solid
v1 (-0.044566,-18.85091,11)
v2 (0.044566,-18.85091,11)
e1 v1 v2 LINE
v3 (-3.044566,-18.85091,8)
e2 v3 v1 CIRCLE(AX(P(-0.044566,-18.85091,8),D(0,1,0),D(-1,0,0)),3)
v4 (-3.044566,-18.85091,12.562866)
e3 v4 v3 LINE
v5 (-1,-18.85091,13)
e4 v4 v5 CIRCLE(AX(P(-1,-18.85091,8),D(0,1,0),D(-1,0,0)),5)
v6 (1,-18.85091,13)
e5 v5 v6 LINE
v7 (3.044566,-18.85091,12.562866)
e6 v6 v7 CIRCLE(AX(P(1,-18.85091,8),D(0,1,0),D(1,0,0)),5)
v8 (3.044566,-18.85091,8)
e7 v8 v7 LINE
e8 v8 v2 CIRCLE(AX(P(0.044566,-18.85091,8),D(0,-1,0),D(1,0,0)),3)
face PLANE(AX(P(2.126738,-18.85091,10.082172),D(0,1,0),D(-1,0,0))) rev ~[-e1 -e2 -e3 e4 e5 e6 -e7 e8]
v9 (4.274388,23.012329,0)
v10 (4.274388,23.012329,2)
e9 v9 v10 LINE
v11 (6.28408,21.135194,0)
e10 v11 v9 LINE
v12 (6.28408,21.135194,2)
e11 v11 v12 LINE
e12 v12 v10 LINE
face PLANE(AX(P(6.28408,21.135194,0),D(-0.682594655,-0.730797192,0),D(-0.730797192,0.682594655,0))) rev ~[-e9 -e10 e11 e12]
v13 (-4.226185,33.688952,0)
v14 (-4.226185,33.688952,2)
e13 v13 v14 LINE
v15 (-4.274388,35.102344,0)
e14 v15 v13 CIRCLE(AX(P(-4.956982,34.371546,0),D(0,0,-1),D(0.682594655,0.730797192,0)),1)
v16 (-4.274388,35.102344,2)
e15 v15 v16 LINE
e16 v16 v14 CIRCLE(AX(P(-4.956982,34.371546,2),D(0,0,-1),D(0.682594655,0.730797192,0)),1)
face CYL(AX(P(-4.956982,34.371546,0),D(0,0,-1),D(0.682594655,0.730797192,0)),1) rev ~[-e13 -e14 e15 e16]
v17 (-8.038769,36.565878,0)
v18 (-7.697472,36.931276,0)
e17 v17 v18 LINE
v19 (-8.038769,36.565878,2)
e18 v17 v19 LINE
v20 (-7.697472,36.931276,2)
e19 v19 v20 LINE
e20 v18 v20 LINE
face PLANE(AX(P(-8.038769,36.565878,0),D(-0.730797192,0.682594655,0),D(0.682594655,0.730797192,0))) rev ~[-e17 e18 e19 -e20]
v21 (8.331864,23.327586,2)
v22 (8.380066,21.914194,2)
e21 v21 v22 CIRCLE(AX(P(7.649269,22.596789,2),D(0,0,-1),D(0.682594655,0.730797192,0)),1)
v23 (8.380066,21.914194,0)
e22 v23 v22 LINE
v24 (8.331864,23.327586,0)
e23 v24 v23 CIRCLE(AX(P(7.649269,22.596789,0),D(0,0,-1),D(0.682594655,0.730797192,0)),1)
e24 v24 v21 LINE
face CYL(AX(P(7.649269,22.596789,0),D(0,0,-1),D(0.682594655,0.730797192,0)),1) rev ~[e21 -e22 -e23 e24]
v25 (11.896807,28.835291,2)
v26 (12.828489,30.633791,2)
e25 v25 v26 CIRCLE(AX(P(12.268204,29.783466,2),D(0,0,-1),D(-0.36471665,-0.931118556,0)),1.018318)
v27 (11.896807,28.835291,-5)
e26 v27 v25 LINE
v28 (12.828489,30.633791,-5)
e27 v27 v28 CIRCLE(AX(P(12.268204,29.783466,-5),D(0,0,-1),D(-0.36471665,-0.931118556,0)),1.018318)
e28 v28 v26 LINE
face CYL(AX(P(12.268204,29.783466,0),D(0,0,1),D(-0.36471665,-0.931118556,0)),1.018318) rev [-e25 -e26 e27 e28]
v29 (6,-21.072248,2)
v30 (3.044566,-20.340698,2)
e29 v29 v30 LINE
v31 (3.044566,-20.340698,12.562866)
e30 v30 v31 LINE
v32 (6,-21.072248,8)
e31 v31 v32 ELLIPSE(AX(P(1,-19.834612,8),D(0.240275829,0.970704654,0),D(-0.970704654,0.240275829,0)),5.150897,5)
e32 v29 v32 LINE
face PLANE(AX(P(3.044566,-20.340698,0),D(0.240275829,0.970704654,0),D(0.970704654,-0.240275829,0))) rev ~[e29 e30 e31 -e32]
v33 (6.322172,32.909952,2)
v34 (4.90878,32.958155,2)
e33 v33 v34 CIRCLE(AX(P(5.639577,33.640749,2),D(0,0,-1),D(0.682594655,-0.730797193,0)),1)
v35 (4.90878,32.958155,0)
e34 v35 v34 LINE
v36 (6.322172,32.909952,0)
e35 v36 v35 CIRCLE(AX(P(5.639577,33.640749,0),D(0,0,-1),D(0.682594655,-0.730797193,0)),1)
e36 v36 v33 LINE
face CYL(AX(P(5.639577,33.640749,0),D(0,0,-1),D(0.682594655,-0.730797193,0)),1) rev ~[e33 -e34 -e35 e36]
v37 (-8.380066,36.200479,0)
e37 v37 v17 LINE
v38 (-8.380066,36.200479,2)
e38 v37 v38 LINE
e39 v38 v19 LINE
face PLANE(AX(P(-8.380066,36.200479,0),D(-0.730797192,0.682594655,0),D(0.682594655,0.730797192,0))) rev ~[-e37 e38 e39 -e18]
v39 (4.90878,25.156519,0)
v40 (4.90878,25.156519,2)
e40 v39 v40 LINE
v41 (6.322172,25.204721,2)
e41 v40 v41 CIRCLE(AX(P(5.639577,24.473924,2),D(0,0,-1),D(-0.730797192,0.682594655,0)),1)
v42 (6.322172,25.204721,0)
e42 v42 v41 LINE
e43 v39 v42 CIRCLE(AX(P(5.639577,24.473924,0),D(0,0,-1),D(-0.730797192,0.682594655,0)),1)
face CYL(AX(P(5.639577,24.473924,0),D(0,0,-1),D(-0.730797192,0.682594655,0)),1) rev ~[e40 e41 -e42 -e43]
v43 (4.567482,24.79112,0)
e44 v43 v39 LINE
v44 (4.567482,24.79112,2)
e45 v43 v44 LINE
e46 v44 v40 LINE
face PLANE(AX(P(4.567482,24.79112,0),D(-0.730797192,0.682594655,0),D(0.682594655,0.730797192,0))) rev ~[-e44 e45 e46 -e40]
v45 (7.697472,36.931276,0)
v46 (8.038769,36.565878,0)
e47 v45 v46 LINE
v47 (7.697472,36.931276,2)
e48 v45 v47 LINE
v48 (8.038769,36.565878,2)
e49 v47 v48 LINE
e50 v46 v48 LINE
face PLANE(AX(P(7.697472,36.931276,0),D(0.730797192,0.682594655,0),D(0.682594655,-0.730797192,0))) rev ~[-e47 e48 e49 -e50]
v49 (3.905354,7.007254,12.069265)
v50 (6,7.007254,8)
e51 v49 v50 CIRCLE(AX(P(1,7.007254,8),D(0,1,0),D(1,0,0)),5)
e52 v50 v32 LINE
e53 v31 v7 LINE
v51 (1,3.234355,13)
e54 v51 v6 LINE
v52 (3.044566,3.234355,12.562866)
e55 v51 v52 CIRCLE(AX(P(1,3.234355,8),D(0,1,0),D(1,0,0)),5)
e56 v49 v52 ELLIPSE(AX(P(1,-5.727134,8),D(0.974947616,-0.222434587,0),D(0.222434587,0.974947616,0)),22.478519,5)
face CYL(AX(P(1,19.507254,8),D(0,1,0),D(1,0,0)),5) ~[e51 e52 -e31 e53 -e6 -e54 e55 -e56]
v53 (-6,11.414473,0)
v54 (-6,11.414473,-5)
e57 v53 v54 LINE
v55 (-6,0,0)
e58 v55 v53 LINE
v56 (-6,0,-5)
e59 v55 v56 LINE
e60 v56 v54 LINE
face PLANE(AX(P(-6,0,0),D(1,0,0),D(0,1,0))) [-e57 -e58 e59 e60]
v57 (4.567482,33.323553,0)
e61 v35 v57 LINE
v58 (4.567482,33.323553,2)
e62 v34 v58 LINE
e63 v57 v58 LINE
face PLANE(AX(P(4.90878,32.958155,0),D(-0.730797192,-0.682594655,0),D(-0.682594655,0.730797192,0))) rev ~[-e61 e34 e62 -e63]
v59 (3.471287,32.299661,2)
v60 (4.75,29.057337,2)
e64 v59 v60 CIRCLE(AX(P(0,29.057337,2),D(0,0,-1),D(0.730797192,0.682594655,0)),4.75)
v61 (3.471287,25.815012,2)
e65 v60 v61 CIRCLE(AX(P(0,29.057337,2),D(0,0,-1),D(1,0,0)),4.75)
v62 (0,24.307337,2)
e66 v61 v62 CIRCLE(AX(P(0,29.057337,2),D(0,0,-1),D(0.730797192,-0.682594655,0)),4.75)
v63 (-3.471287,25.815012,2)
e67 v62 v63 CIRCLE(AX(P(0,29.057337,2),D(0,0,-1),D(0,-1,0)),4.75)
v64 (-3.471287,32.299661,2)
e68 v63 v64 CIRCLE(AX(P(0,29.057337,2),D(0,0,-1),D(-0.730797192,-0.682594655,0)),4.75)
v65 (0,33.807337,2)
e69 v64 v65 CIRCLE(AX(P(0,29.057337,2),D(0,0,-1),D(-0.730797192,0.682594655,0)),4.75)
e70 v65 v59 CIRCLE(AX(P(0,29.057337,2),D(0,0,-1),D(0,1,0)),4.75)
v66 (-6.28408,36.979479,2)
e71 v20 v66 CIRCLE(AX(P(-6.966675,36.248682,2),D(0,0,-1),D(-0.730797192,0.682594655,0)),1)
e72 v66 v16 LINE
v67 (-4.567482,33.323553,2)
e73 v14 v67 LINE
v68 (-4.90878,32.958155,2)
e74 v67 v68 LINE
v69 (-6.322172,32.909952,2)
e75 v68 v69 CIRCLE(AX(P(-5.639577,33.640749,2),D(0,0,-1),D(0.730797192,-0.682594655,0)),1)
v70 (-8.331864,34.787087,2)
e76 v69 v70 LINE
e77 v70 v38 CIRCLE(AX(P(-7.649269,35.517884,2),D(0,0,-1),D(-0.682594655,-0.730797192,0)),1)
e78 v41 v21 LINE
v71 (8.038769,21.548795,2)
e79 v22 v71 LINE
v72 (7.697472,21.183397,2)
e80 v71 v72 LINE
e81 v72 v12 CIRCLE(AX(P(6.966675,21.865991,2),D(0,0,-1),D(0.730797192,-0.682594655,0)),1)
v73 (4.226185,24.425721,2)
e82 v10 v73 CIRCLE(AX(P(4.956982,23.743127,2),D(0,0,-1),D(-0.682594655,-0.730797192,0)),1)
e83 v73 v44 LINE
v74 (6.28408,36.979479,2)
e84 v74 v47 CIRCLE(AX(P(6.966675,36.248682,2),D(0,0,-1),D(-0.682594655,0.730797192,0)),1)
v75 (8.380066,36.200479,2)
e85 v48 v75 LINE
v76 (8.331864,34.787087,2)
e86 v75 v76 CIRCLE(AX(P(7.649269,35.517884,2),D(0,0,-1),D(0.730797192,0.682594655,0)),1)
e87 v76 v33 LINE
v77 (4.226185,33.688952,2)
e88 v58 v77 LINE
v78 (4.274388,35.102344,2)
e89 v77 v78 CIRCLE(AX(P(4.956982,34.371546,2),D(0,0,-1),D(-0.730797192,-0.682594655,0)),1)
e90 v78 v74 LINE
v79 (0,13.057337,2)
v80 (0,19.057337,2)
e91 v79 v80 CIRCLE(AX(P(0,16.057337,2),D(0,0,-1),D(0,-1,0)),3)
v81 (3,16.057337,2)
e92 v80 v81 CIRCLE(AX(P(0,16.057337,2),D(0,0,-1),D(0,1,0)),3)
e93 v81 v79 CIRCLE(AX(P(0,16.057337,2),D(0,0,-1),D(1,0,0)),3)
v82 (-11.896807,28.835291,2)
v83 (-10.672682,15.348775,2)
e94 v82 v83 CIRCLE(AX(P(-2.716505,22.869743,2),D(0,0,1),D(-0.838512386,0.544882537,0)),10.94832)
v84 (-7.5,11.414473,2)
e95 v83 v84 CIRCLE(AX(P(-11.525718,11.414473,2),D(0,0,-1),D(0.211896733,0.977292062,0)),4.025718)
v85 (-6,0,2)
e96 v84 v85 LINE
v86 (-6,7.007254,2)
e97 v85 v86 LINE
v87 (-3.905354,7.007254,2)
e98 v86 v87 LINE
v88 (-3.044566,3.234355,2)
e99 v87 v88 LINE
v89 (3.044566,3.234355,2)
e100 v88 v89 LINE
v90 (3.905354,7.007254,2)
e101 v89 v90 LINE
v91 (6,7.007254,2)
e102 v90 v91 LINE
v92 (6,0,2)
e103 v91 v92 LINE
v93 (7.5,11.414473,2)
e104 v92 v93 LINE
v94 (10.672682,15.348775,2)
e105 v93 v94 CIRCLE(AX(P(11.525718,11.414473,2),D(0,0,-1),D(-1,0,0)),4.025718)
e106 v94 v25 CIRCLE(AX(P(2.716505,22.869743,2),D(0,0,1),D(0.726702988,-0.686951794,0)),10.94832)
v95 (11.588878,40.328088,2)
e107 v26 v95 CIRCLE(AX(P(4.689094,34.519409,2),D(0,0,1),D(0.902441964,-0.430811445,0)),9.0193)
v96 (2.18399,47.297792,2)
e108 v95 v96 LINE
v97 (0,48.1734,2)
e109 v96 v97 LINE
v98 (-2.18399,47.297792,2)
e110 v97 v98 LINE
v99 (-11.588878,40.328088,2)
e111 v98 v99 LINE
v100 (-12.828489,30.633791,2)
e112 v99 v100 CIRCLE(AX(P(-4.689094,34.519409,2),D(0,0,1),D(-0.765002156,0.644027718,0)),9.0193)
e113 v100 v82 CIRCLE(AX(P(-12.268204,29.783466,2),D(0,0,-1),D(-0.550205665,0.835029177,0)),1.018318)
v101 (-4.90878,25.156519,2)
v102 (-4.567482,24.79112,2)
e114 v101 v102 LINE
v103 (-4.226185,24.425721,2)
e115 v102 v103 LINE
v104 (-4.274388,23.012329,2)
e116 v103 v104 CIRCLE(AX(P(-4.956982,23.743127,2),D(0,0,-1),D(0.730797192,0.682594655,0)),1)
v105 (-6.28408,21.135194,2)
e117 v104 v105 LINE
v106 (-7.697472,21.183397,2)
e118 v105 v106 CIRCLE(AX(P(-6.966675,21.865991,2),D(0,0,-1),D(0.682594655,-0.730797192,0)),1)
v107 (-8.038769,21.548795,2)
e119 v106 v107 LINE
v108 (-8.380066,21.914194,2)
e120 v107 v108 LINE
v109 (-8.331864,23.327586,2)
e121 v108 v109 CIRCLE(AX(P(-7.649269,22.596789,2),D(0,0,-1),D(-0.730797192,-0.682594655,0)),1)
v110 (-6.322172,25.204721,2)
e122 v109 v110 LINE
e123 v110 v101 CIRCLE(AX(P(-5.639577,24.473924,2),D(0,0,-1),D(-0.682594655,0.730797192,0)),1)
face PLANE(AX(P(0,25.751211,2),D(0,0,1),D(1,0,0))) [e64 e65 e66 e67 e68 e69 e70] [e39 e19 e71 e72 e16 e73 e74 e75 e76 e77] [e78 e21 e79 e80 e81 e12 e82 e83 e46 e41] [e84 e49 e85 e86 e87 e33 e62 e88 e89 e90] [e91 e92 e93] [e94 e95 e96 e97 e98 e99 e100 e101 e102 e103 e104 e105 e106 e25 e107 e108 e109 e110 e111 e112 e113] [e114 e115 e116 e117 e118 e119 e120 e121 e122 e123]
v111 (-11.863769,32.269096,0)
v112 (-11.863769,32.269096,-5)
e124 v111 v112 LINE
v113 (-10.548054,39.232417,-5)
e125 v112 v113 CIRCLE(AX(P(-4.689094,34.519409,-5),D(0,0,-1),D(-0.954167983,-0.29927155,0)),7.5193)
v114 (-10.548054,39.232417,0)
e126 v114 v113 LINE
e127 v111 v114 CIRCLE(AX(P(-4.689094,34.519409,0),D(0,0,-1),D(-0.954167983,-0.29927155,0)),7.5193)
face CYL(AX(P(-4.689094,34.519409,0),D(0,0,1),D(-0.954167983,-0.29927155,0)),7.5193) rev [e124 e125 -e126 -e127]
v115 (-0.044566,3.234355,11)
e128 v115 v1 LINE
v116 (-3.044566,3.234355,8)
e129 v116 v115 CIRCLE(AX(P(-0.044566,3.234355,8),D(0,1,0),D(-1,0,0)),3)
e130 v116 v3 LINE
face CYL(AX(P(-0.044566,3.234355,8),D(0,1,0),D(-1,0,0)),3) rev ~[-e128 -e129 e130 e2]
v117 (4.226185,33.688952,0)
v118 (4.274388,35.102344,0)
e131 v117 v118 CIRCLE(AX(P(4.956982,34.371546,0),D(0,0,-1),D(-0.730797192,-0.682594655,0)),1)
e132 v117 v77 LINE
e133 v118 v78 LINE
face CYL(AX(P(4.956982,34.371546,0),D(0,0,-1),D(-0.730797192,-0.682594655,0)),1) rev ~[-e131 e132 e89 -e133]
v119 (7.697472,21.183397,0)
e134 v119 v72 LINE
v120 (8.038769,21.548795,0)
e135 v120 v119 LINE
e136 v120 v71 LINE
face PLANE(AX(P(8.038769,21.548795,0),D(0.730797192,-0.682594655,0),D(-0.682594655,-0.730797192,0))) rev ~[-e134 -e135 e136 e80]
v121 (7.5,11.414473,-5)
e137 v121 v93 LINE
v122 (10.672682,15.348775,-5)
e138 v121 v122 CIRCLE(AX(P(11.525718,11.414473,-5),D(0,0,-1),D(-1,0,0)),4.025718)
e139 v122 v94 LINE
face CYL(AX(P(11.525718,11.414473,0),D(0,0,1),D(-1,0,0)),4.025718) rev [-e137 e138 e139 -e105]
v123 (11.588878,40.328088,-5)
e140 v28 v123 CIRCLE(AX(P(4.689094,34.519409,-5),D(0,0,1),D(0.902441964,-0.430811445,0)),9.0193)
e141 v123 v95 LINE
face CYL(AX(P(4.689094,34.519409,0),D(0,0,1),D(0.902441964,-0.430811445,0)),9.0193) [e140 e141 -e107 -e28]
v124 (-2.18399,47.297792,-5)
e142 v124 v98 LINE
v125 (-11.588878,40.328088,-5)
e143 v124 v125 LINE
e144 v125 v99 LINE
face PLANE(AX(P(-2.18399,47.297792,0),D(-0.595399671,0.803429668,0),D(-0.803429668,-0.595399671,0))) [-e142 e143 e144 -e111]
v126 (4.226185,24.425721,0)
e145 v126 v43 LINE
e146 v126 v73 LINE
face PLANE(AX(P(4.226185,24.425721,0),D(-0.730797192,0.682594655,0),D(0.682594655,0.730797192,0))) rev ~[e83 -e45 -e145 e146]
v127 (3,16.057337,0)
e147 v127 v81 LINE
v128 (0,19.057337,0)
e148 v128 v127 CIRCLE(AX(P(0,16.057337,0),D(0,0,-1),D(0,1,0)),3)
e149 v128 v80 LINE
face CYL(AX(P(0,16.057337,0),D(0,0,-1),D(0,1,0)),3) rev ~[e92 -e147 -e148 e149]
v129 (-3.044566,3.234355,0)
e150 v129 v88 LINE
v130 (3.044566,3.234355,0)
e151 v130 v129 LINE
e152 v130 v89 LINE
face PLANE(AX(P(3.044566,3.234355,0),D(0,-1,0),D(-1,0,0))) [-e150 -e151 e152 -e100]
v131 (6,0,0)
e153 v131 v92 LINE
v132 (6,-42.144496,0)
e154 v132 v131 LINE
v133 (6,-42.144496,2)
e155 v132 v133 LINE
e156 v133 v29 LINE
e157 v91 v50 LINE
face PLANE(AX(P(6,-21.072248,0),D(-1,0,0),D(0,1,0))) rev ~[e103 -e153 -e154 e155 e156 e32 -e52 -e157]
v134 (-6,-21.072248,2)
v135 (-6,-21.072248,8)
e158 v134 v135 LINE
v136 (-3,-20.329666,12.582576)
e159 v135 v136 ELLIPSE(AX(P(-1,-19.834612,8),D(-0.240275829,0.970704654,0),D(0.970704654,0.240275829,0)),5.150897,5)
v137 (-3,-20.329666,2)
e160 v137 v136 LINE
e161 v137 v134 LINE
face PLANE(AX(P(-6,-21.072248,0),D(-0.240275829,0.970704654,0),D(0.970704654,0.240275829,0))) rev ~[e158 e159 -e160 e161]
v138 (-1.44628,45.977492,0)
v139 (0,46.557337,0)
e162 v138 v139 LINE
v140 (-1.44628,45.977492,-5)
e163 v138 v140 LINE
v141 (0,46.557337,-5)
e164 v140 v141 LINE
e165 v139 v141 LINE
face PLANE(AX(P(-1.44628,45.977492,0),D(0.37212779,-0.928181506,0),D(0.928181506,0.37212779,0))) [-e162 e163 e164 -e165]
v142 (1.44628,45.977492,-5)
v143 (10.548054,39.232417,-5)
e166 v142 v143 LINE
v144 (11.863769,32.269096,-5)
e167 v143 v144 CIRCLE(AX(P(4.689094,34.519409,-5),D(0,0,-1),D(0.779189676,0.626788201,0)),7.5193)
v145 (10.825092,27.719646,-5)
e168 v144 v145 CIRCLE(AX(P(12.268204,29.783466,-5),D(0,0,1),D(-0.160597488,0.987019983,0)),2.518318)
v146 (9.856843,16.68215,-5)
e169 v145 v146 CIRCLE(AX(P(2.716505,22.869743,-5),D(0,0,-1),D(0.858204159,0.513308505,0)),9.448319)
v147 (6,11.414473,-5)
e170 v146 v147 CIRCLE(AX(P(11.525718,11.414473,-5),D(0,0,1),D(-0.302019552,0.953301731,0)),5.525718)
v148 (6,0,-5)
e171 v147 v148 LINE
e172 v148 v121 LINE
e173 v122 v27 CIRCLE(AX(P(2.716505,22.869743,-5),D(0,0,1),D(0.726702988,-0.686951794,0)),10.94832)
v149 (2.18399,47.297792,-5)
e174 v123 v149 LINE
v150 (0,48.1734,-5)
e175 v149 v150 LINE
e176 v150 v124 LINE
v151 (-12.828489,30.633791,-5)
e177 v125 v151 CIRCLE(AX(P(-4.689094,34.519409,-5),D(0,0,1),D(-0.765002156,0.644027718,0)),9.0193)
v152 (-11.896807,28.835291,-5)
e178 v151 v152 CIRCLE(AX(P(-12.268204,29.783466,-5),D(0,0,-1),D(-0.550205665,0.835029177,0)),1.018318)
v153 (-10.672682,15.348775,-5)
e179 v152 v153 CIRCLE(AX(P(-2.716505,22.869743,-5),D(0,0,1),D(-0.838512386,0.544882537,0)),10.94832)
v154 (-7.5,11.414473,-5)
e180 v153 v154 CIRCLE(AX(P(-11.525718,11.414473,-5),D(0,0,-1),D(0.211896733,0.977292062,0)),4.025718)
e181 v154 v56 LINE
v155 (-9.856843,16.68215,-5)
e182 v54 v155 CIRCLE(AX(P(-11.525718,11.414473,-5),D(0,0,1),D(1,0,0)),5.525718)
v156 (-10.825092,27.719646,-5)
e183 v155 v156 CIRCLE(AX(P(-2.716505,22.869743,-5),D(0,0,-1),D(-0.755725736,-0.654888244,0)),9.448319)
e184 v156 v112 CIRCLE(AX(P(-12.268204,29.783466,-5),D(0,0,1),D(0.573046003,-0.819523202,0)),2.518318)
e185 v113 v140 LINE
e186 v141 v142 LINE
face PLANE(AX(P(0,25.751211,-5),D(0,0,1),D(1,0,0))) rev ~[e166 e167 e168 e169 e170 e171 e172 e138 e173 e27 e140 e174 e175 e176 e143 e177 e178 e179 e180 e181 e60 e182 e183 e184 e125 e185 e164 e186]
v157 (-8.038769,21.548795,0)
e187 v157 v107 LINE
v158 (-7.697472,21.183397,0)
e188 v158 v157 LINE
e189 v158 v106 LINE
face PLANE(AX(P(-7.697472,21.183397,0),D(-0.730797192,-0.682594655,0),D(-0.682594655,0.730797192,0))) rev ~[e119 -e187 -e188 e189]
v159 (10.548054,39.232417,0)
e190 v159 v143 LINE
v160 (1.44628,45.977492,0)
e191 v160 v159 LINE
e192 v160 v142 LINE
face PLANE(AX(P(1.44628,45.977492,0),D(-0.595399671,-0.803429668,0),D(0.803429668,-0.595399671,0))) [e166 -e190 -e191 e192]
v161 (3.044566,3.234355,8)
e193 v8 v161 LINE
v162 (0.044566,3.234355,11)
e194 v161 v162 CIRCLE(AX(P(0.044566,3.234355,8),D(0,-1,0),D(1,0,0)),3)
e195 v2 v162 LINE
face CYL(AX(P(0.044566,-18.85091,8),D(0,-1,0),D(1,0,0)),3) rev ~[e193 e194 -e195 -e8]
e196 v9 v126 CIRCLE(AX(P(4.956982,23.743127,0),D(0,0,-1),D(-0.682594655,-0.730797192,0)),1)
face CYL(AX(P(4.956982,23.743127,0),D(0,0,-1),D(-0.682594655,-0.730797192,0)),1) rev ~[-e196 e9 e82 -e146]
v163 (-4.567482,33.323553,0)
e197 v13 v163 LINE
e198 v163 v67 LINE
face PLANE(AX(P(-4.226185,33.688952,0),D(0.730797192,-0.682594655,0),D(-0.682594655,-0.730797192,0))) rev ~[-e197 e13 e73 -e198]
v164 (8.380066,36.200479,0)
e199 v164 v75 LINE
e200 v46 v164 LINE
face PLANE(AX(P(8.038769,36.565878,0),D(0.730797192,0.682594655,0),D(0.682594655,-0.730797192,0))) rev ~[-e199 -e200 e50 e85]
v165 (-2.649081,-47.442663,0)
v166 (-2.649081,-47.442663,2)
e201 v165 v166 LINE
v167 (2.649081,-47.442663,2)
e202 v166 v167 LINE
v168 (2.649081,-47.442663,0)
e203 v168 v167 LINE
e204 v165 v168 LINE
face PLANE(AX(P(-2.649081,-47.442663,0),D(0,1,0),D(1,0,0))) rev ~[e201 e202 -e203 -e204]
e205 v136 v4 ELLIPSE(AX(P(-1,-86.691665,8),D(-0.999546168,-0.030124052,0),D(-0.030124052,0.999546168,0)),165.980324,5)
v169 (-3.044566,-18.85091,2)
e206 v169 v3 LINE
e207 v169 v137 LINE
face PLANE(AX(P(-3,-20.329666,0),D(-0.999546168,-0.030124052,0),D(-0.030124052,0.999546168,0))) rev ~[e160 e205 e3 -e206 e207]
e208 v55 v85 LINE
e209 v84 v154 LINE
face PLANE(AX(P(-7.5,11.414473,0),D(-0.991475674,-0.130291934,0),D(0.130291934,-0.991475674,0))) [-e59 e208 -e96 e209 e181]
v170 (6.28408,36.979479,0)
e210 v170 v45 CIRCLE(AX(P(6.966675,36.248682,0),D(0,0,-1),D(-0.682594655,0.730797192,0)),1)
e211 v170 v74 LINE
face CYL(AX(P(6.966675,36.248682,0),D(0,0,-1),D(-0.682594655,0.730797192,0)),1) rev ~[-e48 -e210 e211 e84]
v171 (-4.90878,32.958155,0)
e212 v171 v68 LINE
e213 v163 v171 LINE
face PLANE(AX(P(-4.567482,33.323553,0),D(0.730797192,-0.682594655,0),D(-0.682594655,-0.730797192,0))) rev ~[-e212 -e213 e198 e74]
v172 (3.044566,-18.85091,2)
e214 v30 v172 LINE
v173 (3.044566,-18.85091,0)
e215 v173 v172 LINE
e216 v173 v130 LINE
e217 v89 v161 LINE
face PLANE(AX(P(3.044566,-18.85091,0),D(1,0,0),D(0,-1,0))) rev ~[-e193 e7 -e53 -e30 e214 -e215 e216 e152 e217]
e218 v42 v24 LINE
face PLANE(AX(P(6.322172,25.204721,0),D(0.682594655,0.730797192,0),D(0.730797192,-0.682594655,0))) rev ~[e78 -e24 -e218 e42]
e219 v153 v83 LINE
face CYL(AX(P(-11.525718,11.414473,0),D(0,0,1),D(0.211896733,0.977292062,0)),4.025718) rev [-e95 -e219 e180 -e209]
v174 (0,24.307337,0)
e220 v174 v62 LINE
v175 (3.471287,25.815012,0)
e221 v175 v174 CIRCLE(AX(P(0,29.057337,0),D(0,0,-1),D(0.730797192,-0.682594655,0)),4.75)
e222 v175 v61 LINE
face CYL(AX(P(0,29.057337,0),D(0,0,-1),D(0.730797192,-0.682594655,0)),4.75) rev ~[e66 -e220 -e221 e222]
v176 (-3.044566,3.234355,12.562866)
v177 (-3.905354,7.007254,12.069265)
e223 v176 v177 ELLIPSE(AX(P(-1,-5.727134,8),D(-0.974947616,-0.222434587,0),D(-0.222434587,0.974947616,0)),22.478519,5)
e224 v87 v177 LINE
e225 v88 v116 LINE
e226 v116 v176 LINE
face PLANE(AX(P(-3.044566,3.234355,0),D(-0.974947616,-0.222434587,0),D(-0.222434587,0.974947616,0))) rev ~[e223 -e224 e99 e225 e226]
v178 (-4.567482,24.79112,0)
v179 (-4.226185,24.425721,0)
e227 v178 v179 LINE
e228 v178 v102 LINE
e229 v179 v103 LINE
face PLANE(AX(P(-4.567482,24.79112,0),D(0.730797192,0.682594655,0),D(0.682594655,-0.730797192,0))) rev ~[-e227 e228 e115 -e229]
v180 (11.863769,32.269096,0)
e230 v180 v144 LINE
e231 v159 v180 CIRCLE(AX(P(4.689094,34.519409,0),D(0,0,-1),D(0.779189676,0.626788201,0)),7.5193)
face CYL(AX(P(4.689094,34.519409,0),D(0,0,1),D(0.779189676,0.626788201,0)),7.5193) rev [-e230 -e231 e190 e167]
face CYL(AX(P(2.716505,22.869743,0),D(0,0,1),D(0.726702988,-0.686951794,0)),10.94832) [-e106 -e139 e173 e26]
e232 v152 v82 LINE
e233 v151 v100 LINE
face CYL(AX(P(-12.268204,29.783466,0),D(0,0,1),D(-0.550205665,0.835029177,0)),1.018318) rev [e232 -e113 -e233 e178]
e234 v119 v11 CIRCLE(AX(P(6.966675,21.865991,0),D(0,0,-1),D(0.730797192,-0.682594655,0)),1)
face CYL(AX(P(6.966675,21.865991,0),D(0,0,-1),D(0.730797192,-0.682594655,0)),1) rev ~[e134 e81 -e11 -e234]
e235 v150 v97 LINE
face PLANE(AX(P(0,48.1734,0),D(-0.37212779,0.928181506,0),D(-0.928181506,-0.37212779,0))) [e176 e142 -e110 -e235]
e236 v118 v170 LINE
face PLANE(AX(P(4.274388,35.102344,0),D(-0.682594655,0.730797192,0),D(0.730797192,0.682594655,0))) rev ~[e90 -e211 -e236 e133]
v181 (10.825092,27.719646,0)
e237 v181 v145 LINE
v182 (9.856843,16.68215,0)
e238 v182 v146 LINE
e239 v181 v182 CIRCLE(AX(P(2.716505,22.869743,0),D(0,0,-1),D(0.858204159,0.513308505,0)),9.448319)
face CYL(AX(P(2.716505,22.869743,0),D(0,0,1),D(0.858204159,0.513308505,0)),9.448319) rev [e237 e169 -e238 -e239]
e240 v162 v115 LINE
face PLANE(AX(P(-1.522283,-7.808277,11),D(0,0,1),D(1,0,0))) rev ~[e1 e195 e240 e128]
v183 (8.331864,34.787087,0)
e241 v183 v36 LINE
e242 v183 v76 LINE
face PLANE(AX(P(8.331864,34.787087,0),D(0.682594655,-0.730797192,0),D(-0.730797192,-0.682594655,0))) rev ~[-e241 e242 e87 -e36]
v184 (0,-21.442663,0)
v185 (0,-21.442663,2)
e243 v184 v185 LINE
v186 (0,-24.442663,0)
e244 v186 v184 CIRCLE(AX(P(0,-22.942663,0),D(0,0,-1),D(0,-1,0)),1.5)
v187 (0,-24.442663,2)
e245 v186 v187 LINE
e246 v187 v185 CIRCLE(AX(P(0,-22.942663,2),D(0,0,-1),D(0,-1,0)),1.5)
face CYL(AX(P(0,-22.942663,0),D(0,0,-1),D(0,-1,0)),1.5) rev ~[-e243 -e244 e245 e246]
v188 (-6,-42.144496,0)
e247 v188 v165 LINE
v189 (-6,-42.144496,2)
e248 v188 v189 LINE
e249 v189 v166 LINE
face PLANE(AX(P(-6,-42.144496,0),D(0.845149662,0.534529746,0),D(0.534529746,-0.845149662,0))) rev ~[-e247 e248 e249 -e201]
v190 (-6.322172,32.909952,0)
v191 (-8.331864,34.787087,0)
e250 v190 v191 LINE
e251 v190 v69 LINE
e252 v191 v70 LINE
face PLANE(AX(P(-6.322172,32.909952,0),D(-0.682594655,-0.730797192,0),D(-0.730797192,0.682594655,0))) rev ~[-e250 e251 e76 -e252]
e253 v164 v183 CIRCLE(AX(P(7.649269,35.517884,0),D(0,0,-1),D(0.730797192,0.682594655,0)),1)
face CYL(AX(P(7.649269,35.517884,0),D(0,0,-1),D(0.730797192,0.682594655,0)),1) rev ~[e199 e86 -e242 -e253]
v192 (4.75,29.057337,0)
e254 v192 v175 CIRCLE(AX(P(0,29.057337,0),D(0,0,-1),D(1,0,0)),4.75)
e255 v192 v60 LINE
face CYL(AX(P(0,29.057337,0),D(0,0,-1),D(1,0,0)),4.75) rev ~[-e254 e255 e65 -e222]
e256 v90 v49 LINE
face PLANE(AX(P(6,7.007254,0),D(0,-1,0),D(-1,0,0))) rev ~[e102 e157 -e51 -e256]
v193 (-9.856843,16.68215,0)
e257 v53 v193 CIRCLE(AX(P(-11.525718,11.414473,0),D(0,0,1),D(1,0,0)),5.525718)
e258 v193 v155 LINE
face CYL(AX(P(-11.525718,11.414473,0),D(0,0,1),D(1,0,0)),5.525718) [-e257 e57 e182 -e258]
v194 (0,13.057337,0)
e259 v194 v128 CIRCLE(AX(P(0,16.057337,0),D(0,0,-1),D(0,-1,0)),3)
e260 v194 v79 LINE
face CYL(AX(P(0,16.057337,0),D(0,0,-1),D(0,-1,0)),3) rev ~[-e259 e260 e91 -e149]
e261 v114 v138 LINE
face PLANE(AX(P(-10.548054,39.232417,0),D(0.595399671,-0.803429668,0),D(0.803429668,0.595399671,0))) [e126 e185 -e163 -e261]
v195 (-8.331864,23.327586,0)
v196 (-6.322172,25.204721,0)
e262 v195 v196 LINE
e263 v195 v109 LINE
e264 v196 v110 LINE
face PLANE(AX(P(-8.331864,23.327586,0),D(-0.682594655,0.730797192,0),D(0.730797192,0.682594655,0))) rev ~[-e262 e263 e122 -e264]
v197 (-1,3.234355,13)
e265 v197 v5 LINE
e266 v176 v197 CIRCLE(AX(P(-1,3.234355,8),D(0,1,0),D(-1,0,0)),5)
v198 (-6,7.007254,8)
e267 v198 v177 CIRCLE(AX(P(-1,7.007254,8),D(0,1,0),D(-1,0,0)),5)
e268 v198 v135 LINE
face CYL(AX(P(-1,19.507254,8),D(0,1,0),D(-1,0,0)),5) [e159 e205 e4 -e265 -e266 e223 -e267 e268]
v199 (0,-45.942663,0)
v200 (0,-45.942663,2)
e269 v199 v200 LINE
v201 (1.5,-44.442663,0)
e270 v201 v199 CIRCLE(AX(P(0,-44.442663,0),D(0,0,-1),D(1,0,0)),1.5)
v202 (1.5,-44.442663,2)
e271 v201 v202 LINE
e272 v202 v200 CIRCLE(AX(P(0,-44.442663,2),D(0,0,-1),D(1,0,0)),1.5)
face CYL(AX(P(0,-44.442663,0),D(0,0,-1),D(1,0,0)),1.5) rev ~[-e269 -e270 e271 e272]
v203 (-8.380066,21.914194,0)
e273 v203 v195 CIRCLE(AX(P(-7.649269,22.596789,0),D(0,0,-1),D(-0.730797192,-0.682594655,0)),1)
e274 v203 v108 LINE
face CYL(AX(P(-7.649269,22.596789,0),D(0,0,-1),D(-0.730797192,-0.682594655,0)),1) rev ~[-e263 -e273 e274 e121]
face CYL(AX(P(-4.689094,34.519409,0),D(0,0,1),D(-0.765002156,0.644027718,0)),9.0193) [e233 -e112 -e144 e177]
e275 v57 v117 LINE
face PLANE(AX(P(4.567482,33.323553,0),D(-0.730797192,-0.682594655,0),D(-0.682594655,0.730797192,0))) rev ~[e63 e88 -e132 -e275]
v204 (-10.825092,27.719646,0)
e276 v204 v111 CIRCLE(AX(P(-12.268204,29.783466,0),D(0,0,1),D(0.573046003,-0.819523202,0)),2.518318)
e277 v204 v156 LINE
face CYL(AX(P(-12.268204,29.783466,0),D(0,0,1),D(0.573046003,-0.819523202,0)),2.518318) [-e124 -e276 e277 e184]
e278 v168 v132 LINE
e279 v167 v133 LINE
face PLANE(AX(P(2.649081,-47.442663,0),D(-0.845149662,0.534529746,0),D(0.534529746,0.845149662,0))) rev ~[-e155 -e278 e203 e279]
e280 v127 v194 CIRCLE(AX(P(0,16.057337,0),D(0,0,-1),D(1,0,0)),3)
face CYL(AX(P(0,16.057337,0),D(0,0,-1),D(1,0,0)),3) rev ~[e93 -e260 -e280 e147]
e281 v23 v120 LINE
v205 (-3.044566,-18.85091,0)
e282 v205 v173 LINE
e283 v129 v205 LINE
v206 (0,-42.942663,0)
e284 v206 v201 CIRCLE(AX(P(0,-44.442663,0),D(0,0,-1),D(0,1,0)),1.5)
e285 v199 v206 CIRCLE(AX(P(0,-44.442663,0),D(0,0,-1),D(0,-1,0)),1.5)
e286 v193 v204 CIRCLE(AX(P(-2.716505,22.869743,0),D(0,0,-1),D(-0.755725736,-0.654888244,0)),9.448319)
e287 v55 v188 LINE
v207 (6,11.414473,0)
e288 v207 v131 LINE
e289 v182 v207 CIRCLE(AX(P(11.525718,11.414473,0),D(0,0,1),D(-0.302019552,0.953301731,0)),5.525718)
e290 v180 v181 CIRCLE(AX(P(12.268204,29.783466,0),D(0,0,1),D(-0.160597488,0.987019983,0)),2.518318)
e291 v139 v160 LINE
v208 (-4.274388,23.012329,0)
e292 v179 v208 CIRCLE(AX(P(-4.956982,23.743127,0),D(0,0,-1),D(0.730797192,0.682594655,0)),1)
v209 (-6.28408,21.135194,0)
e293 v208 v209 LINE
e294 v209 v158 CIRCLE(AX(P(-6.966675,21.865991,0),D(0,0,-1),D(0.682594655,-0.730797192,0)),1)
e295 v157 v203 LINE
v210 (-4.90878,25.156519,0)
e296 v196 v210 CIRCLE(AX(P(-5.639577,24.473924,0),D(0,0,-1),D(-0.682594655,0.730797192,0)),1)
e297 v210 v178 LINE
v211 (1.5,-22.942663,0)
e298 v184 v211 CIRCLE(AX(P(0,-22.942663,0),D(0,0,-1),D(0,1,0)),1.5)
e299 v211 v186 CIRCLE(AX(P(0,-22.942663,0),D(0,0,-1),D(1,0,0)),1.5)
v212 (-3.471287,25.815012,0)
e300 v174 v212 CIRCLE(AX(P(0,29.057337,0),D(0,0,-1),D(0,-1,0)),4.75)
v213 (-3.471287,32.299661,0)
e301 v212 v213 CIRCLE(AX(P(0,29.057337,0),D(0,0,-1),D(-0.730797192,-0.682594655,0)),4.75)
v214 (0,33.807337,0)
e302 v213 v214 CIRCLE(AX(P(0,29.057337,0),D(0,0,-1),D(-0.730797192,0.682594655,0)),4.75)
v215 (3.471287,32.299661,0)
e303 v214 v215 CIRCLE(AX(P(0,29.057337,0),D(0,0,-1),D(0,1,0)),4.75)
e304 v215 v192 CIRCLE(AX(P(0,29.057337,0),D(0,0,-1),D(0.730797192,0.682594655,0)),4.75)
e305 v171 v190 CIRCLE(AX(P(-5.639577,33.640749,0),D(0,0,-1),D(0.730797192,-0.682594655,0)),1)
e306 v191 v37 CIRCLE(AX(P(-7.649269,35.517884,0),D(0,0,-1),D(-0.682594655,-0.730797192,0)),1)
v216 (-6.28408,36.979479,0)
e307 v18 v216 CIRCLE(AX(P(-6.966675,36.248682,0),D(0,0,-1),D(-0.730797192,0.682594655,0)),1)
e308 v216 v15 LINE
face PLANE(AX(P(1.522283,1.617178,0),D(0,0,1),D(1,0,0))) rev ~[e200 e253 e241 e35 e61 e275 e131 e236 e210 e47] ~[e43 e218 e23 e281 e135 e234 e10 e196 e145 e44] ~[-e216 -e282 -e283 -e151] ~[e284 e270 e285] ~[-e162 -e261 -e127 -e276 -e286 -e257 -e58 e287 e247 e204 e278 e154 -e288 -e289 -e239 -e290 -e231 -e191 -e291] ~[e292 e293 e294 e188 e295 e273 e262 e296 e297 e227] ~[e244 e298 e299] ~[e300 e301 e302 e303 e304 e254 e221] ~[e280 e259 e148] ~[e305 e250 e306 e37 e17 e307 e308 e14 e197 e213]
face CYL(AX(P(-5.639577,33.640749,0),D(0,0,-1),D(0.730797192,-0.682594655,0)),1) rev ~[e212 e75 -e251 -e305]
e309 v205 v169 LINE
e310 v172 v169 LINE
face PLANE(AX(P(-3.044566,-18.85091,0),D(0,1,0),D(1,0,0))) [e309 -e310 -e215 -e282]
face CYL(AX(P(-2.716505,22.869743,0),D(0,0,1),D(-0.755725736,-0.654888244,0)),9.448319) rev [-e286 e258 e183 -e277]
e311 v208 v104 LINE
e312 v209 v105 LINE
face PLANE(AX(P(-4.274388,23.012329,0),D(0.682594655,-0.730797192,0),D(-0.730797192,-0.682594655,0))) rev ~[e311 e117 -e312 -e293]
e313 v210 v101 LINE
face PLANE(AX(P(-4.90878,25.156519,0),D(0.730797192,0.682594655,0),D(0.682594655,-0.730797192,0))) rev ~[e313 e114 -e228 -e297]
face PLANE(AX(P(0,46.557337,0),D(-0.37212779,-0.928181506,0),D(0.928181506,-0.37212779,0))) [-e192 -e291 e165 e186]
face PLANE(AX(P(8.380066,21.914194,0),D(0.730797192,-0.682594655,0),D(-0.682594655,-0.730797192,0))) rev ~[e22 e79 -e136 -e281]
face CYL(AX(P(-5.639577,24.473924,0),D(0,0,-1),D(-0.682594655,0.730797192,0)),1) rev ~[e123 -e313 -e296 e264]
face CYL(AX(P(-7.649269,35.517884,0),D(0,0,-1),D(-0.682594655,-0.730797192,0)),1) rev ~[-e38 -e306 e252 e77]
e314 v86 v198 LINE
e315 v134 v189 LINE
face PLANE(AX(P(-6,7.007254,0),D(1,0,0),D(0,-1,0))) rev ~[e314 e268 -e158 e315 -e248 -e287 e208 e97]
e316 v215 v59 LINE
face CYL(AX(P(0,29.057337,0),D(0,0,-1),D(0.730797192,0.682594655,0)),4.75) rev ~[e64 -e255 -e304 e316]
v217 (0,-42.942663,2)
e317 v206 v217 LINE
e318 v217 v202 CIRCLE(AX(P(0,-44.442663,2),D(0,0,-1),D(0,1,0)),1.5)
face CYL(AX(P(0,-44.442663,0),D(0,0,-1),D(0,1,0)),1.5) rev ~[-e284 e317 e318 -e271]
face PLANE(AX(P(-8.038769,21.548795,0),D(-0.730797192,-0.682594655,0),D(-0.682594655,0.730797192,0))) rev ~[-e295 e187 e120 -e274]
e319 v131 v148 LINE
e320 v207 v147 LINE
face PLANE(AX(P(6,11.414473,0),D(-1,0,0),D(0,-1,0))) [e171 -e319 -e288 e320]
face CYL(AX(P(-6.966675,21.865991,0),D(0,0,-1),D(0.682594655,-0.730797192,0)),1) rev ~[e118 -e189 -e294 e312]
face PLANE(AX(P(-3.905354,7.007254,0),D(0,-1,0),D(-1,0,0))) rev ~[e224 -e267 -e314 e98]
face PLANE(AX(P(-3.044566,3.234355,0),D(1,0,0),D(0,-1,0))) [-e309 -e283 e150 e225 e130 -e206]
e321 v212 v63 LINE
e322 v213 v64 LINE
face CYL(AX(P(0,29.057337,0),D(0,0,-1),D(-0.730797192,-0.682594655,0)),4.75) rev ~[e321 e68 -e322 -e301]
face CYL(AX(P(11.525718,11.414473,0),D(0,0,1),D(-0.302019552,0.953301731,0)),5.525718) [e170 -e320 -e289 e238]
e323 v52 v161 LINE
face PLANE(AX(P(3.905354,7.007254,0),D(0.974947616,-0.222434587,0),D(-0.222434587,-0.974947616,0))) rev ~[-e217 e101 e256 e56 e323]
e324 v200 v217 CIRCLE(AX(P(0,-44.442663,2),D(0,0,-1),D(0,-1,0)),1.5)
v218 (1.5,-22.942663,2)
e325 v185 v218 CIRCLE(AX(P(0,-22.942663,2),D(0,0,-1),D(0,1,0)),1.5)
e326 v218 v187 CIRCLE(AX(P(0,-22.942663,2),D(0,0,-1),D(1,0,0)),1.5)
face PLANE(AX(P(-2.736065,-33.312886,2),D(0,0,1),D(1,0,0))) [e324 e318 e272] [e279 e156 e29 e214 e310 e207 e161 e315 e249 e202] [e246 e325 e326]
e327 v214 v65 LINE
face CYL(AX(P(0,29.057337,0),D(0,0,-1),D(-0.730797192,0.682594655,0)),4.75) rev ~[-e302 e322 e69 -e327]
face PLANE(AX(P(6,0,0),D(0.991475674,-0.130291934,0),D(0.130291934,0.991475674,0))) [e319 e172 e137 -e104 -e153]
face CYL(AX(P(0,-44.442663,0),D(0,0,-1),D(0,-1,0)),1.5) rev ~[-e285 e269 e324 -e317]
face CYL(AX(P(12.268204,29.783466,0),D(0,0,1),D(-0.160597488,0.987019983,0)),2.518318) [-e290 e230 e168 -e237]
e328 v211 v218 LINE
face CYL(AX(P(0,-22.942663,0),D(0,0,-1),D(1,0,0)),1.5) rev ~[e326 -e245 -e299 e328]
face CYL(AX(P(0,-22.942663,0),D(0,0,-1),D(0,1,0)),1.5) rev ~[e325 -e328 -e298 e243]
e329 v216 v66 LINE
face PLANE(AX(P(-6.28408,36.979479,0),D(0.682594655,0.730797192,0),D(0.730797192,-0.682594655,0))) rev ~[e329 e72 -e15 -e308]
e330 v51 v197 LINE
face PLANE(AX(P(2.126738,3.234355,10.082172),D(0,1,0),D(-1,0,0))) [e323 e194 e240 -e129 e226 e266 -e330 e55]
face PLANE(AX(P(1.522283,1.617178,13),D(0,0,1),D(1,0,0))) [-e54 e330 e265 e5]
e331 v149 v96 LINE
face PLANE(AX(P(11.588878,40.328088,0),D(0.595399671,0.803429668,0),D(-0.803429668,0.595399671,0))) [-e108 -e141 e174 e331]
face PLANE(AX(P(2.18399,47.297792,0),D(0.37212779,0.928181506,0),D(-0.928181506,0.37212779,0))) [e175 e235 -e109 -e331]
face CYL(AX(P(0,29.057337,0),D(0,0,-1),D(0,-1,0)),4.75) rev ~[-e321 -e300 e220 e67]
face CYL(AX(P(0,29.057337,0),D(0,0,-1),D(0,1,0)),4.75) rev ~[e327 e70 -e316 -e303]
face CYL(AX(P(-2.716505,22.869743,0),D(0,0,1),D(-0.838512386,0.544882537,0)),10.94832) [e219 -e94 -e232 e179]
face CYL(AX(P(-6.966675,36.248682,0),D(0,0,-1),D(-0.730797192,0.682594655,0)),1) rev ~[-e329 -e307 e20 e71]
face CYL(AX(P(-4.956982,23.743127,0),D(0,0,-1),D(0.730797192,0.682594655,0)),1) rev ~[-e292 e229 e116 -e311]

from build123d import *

# Parameters (mm, degrees)
F1_DEPTH     = 2
F0_W         = 3.0445663724
F0_H         = 3.2343552448
F0_H_2       = 18.850909546
F2_DEPTH     = 13
F3_DEPTH     = 11
F4_T4_DEPTH  = 22.0852647908
F4_T9_DEPTH  = 22.0852647908
F4_T15_DEPTH = 22.0852647908
F4_T20_DEPTH = 22.0852647908
F5_DEPTH     = 5
F6_T1_DEPTH  = 53.0795018189


# Not quite as in the source:
# - a fillet or chamfer that OpenCascade refuses, or shapes differently, is made with other operations: its cross-section is extruded or revolved along the edge and cut away or added


with BuildPart() as f1:
    # F0 (on Top) → F1 (new body)
    with BuildSketch(Plane.XY):
        with BuildLine():
            Line((0, -21.442663461), (0, -19.587084651))
            Line((0, -19.587084651), (-3, -20.329666324))
            Line((-3, -20.329666324), (-6, -21.0722479969))
            Line((-6, -21.0722479969), (-6, -42.1444959939))
            Line((-6, -42.1444959939), (-2.6490809396, -47.442663461))
            Line((-2.6490809396, -47.442663461), (0, -47.442663461))
            Line((0, -47.442663461), (0, -45.942663461))
            ThreePointArc((0, -45.942663461), (-1.5, -44.442663461), (0, -42.942663461))
            Line((0, -42.942663461), (0, -24.442663461))
            ThreePointArc((0, -24.442663461), (-1.5, -22.942663461), (0, -21.442663461))
        make_face()
        with BuildLine():
            Line((3.0445663724, -20.3406977144), (0, -19.587084651))
            Line((0, -19.587084651), (0, -21.442663461))
            ThreePointArc((0, -21.442663461), (1.0606601718, -21.8820032892), (1.5, -22.942663461))
            ThreePointArc((1.5, -22.942663461), (1.0606601718, -24.0033236327), (0, -24.442663461))
            Line((0, -24.442663461), (0, -42.942663461))
            ThreePointArc((0, -42.942663461), (1.0606601718, -43.3820032892), (1.5, -44.442663461))
            ThreePointArc((1.5, -44.442663461), (1.0606601718, -45.5033236327), (0, -45.942663461))
            Line((0, -45.942663461), (0, -47.442663461))
            Line((0, -47.442663461), (2.6490809396, -47.442663461))
            Line((2.6490809396, -47.442663461), (6, -42.1444959939))
            Line((6, -42.1444959939), (6, -21.0722479969))
            Line((6, -21.0722479969), (3.0445663724, -20.3406977144))
        make_face()
        Polygon((3.0445663724, -18.850909546), (0, -18.850909546), (0, -19.587084651), (3.0445663724, -20.3406977144), align=None)
        Polygon((0, -19.587084651), (0, -18.850909546), (-3.0445663724, -18.850909546), (-3, -20.329666324), align=None)
    extrude(amount=F1_DEPTH)



with BuildPart() as f1b:
    # F0 (on Top) → F1, piece 2 (new body)
    with BuildSketch(Plane.XY):
        with BuildLine():
            Line((-6, 7.0072538219), (-6, 11.414472945))
            ThreePointArc((-6, 11.414472945), (-7.0672827337, 14.6788128793), (-9.8568433896, 16.6821498424))
            ThreePointArc((-9.8568433896, 16.6821498424), (-12.1286787232, 22.0440734554), (-10.825092271, 27.7196459355))
            ThreePointArc((-10.825092271, 27.7196459355), (-9.8130602705, 30.3439953427), (-11.8637687892, 32.269096159))
            ThreePointArc((-11.8637687892, 32.269096159), (-12.0776575065, 35.9154722642), (-10.5480544763, 39.2324168906))
            Line((-10.5480544763, 39.2324168906), (-1.4462802792, 45.9774918854))
            Line((-1.4462802792, 45.9774918854), (0, 46.557336539))
            Line((0, 46.557336539), (1.4462802792, 45.9774918854))
            Line((1.4462802792, 45.9774918854), (10.5480544763, 39.2324168906))
            ThreePointArc((10.5480544763, 39.2324168906), (12.0776575065, 35.9154722642), (11.8637687892, 32.269096159))
            ThreePointArc((11.8637687892, 32.269096159), (9.8130602705, 30.3439953427), (10.825092271, 27.7196459355))
            ThreePointArc((10.825092271, 27.7196459355), (12.1286787232, 22.0440734554), (9.8568433896, 16.6821498424))
            ThreePointArc((9.8568433896, 16.6821498424), (7.0672827337, 14.6788128793), (6, 11.414472945))
            Line((6, 11.414472945), (6, 7.0072538219))
            Line((6, 7.0072538219), (6, 0))
            Line((6, 0), (7.5000002513, 11.414472945))
            ThreePointArc((7.5000002513, 11.414472945), (8.391991284, 13.9415584091), (10.6726818627, 15.3487753182))
            ThreePointArc((10.6726818627, 15.3487753182), (13.6200024271, 21.8800699646), (11.8968068959, 28.8352914154))
            ThreePointArc((11.8968068959, 28.8352914154), (11.3640087027, 30.251868892), (12.8284885302, 30.6337910005))
            ThreePointArc((12.8284885302, 30.6337910005), (13.635549564, 35.6633929404), (11.5888776878, 40.3280877233))
            Line((11.5888776878, 40.3280877233), (2.1839900136, 47.2977917949))
            Line((2.1839900136, 47.2977917949), (0, 48.173400037))
            Line((0, 48.173400037), (-2.1839900136, 47.2977917949))
            Line((-2.1839900136, 47.2977917949), (-11.5888776878, 40.3280877233))
            ThreePointArc((-11.5888776878, 40.3280877233), (-13.635549564, 35.6633929404), (-12.8284885302, 30.6337910005))
            ThreePointArc((-12.8284885302, 30.6337910005), (-11.3640087027, 30.251868892), (-11.8968068959, 28.8352914154))
            ThreePointArc((-11.8968068959, 28.8352914154), (-13.6200024271, 21.8800699646), (-10.6726818627, 15.3487753182))
            ThreePointArc((-10.6726818627, 15.3487753182), (-8.391991284, 13.9415584091), (-7.5000002513, 11.414472945))
            Line((-7.5000002513, 11.414472945), (-6, 0))
            Line((-6, 0), (-6, 7.0072538219))
        make_face()
        with BuildLine():
            Line((-6, 11.414472945), (0, 11.414472945))
            Line((0, 11.414472945), (0, 13.057336539))
            ThreePointArc((0, 13.057336539), (-3, 16.057336539), (0, 19.057336539))
            Line((0, 19.057336539), (0, 24.307336539))
            ThreePointArc((0, 24.307336539), (-1.892281439, 24.7005291121), (-3.4712866642, 25.8150119262))
            ThreePointArc((-3.4712866642, 25.8150119262), (-4.75, 29.057336539), (-3.4712866642, 32.2996611519))
            ThreePointArc((-3.4712866642, 32.2996611519), (-1.892281439, 33.414143966), (0, 33.807336539))
            Line((0, 33.807336539), (0, 46.557336539))
            Line((0, 46.557336539), (-1.4462802792, 45.9774918854))
            Line((-1.4462802792, 45.9774918854), (-10.5480544763, 39.2324168906))
            ThreePointArc((-10.5480544763, 39.2324168906), (-12.0776575065, 35.9154722642), (-11.8637687892, 32.269096159))
            ThreePointArc((-11.8637687892, 32.269096159), (-9.8130602705, 30.3439953427), (-10.825092271, 27.7196459355))
            ThreePointArc((-10.825092271, 27.7196459355), (-12.1286787232, 22.0440734554), (-9.8568433896, 16.6821498424))
            ThreePointArc((-9.8568433896, 16.6821498424), (-7.0672827337, 14.6788128793), (-6, 11.414472945))
        make_face()
        with BuildLine():
            Line((-4.9087797805, 25.1565185394), (-4.5674824529, 24.7911199432))
            Line((-4.5674824529, 24.7911199432), (-4.2261851252, 24.4257213469))
            ThreePointArc((-4.2261851252, 24.4257213469), (-3.9575633576, 23.7090423507), (-4.2743876623, 23.0123294991))
            Line((-4.2743876623, 23.0123294991), (-6.2840799416, 21.135194197))
            ThreePointArc((-6.2840799416, 21.135194197), (-7.0007589378, 20.8665724294), (-7.6974717894, 21.1833967341))
            Line((-7.6974717894, 21.1833967341), (-8.038769117, 21.5487953303))
            Line((-8.038769117, 21.5487953303), (-8.3800664447, 21.9141939265))
            ThreePointArc((-8.3800664447, 21.9141939265), (-8.6486882123, 22.6308729227), (-8.3318639076, 23.3275857743))
            Line((-8.3318639076, 23.3275857743), (-6.3221716283, 25.2047210765))
            ThreePointArc((-6.3221716283, 25.2047210765), (-5.6054926321, 25.4733428441), (-4.9087797805, 25.1565185394))
        make_face(mode=Mode.SUBTRACT)
        with BuildLine():
            Line((-4.2261851252, 33.6889517311), (-4.5674824529, 33.3235531349))
            Line((-4.5674824529, 33.3235531349), (-4.9087797805, 32.9581545387))
            ThreePointArc((-4.9087797805, 32.9581545387), (-5.6054926321, 32.641330234), (-6.3221716283, 32.9099520015))
            Line((-6.3221716283, 32.9099520015), (-8.3318639076, 34.7870873037))
            ThreePointArc((-8.3318639076, 34.7870873037), (-8.6486882123, 35.4838001553), (-8.3800664447, 36.2004791515))
            Line((-8.3800664447, 36.2004791515), (-8.038769117, 36.5658777478))
            Line((-8.038769117, 36.5658777478), (-7.6974717894, 36.931276344))
            ThreePointArc((-7.6974717894, 36.931276344), (-7.0007589378, 37.2481006487), (-6.2840799416, 36.9794788811))
            Line((-6.2840799416, 36.9794788811), (-4.2743876623, 35.1023435789))
            ThreePointArc((-4.2743876623, 35.1023435789), (-3.9575633576, 34.4056307273), (-4.2261851252, 33.6889517311))
        make_face(mode=Mode.SUBTRACT)
        with BuildLine():
            Line((0, 13.057336539), (0, 11.414472945))
            Line((0, 11.414472945), (6, 11.414472945))
            ThreePointArc((6, 11.414472945), (7.0672827337, 14.6788128793), (9.8568433896, 16.6821498424))
            ThreePointArc((9.8568433896, 16.6821498424), (12.1286787232, 22.0440734554), (10.825092271, 27.7196459355))
            ThreePointArc((10.825092271, 27.7196459355), (9.8130602705, 30.3439953427), (11.8637687892, 32.269096159))
            ThreePointArc((11.8637687892, 32.269096159), (12.0776575065, 35.9154722642), (10.5480544763, 39.2324168906))
            Line((10.5480544763, 39.2324168906), (1.4462802792, 45.9774918854))
            Line((1.4462802792, 45.9774918854), (0, 46.557336539))
            Line((0, 46.557336539), (0, 33.807336539))
            ThreePointArc((0, 33.807336539), (1.892281439, 33.414143966), (3.4712866642, 32.2996611519))
            ThreePointArc((3.4712866642, 32.2996611519), (4.4187731134, 30.8000195775), (4.75, 29.057336539))
            ThreePointArc((4.75, 29.057336539), (4.4187731134, 27.3146535006), (3.4712866642, 25.8150119262))
            ThreePointArc((3.4712866642, 25.8150119262), (1.892281439, 24.7005291121), (0, 24.307336539))
            Line((0, 24.307336539), (0, 19.057336539))
            ThreePointArc((0, 19.057336539), (2.1213203436, 18.1786568826), (3, 16.057336539))
            ThreePointArc((3, 16.057336539), (2.1213203436, 13.9360161955), (0, 13.057336539))
        make_face()
        with BuildLine():
            Line((4.2261851252, 24.4257213469), (4.5674824529, 24.7911199432))
            Line((4.5674824529, 24.7911199432), (4.9087797805, 25.1565185394))
            ThreePointArc((4.9087797805, 25.1565185394), (5.6054926321, 25.4733428441), (6.3221716283, 25.2047210765))
            Line((6.3221716283, 25.2047210765), (8.3318639076, 23.3275857743))
            ThreePointArc((8.3318639076, 23.3275857743), (8.6486882123, 22.6308729227), (8.3800664447, 21.9141939265))
            Line((8.3800664447, 21.9141939265), (8.038769117, 21.5487953303))
            Line((8.038769117, 21.5487953303), (7.6974717894, 21.1833967341))
            ThreePointArc((7.6974717894, 21.1833967341), (7.0007589378, 20.8665724294), (6.2840799416, 21.135194197))
            Line((6.2840799416, 21.135194197), (4.2743876623, 23.0123294991))
            ThreePointArc((4.2743876623, 23.0123294991), (3.9575633576, 23.7090423507), (4.2261851252, 24.4257213469))
        make_face(mode=Mode.SUBTRACT)
        with BuildLine():
            Line((4.9087797805, 32.9581545387), (4.5674824529, 33.3235531349))
            Line((4.5674824529, 33.3235531349), (4.2261851252, 33.6889517311))
            ThreePointArc((4.2261851252, 33.6889517311), (3.9575633576, 34.4056307273), (4.2743876623, 35.1023435789))
            Line((4.2743876623, 35.1023435789), (6.2840799416, 36.9794788811))
            ThreePointArc((6.2840799416, 36.9794788811), (7.0007589378, 37.2481006487), (7.6974717894, 36.931276344))
            Line((7.6974717894, 36.931276344), (8.038769117, 36.5658777478))
            Line((8.038769117, 36.5658777478), (8.3800664447, 36.2004791515))
            ThreePointArc((8.3800664447, 36.2004791515), (8.6486882123, 35.4838001553), (8.3318639076, 34.7870873037))
            Line((8.3318639076, 34.7870873037), (6.3221716283, 32.9099520015))
            ThreePointArc((6.3221716283, 32.9099520015), (5.6054926321, 32.641330234), (4.9087797805, 32.9581545387))
        make_face(mode=Mode.SUBTRACT)
        Polygon((0, 11.414472945), (0, 7.0072538219), (3.9053543005, 7.0072538219), (6, 7.0072538219), (6, 11.414472945), align=None)
        Polygon((-3.9053543005, 7.0072538219), (0, 7.0072538219), (0, 11.414472945), (-6, 11.414472945), (-6, 7.0072538219), align=None)
        Polygon((0, 3.2343552448), (0, 7.0072538219), (-3.9053543005, 7.0072538219), (-3.0445663724, 3.2343552448), align=None)
        Polygon((3.9053543005, 7.0072538219), (0, 7.0072538219), (0, 3.2343552448), (3.0445663724, 3.2343552448), align=None)
    extrude(amount=F1_DEPTH)


with BuildPart() as f1_1:
    add(f1.part)

    add(f1b.part)  # F2 merges F1b
    # F0 (on Top) → F2 (join)
    with BuildSketch(Plane.XY):
        with Locations((1.5222831862, 1.6171776224)):
            Rectangle(F0_W, F0_H)
        Polygon((-3.0445663724, 3.2343552448), (-3.9053543005, 7.0072538219), (-6, 7.0072538219), (-6, 0), (-6, -21.0722479969), (-3, -20.329666324), (-3.0445663724, -18.850909546), align=None)
        with Locations((1.5222831862, -9.425454773)):
            Rectangle(F0_W, F0_H_2)
        Polygon((0, 0), (0, 3.2343552448), (-3.0445663724, 3.2343552448), (-3.0445663724, -18.850909546), (0, -18.850909546), align=None)
        Polygon((6, 0), (3.0445663724, 0), (3.0445663724, -18.850909546), (3.0445663724, -20.3406977144), (6, -21.0722479969), align=None)
        Polygon((6, 7.0072538219), (3.9053543005, 7.0072538219), (3.0445663724, 3.2343552448), (3.0445663724, 0), (6, 0), align=None)
    extrude(amount=F2_DEPTH)

    # F0 (on Top) → F3 (cut)
    with BuildSketch(Plane.XY):
        Polygon((0, 0), (0, 3.2343552448), (-3.0445663724, 3.2343552448), (-3.0445663724, -18.850909546), (0, -18.850909546), align=None)
        with Locations((1.5222831862, -9.425454773)):
            Rectangle(F0_W, F0_H_2)
        with Locations((1.5222831862, 1.6171776224)):
            Rectangle(F0_W, F0_H)
    extrude(amount=F3_DEPTH, mode=Mode.SUBTRACT)

    # F4: fillet of radius 3 on 2 edges, made by hand


with BuildPart() as f4_tool2:
    # F4_s3 → F4_t4 (new body)
    with BuildSketch(Plane.XZ.offset(-3.2343552448)):
        with BuildLine():
            ThreePointArc((-3.0445663724, 8), (-2.165886716, 10.1213203436), (-0.0445663724, 11))
            Line((-0.0445663724, 11), (-3.0445663724, 11))
            Line((-3.0445663724, 11), (-3.0445663724, 8))
        make_face()
    extrude(amount=F4_T4_DEPTH)

    split(bisect_by=Plane(origin=(-2.1925209423, -0.5002243025, 0), x_dir=(0, 0, 1), z_dir=(0.9749476162, 0.2224345875, 0)), keep=Keep.TOP)


with BuildPart() as f1_2:
    add(f1_1.part)

    # F4_t1: union F4_tool2
    add(f4_tool2.part)


with BuildPart() as f4_tool7:
    # F4_s8 → F4_t9 (new body)
    with BuildSketch(Plane.XZ.offset(-3.2343552448)):
        with BuildLine():
            ThreePointArc((-3.0445663724, 8), (-2.165886716, 10.1213203436), (-0.0445663724, 11))
            Line((-0.0445663724, 11), (-3.0445663724, 11))
            Line((-3.0445663724, 11), (-3.0445663724, 8))
        make_face()
    extrude(amount=F4_T9_DEPTH)

    split(bisect_by=Plane(origin=(-2.1925209423, -0.5002243025, 0), x_dir=(0, 0, 1), z_dir=(-0.9749476162, -0.2224345875, 0)), keep=Keep.TOP)

    split(bisect_by=Plane(origin=(-3.6094116269, -0.1087794728, 0), x_dir=(0, 0, 1), z_dir=(0.9995461677, 0.0301240525, 0)), keep=Keep.TOP)


with BuildPart() as f1_3:
    add(f1_2.part)

    # F4_t6: union F4_tool7
    add(f4_tool7.part)


with BuildPart() as f4_tool13:
    # F4_s14 → F4_t15 (new body)
    with BuildSketch(Plane.XZ.offset(18.850909546)):
        with BuildLine():
            ThreePointArc((3.0445663724, 8), (2.165886716, 10.1213203436), (0.0445663724, 11))
            Line((0.0445663724, 11), (3.0445663724, 11))
            Line((3.0445663724, 11), (3.0445663724, 8))
        make_face()
    extrude(amount=-F4_T15_DEPTH)

    split(bisect_by=Plane(origin=(2.1925209423, -0.5002243025, 0), x_dir=(0, 0, 1), z_dir=(0.9749476162, -0.2224345875, 0)), keep=Keep.TOP)


with BuildPart() as f1_4:
    add(f1_3.part)

    # F4_t12: union F4_tool13
    add(f4_tool13.part)


with BuildPart() as f4_tool18:
    # F4_s19 → F4_t20 (new body)
    with BuildSketch(Plane.XZ.offset(18.850909546)):
        with BuildLine():
            ThreePointArc((3.0445663724, 8), (2.165886716, 10.1213203436), (0.0445663724, 11))
            Line((0.0445663724, 11), (3.0445663724, 11))
            Line((3.0445663724, 11), (3.0445663724, 8))
        make_face()
    extrude(amount=-F4_T20_DEPTH)

    split(bisect_by=Plane(origin=(2.1925209423, -0.5002243025, 0), x_dir=(0, 0, 1), z_dir=(-0.9749476162, 0.2224345875, 0)), keep=Keep.TOP)


with BuildPart() as f1_5:
    add(f1_4.part)

    # F4_t17: union F4_tool18
    add(f4_tool18.part)

    # F0 (on Top) → F5 (join)
    with BuildSketch(Plane.XY):
        with BuildLine():
            Line((-6, 7.0072538219), (-6, 11.414472945))
            ThreePointArc((-6, 11.414472945), (-7.0672827337, 14.6788128793), (-9.8568433896, 16.6821498424))
            ThreePointArc((-9.8568433896, 16.6821498424), (-12.1286787232, 22.0440734554), (-10.825092271, 27.7196459355))
            ThreePointArc((-10.825092271, 27.7196459355), (-9.8130602705, 30.3439953427), (-11.8637687892, 32.269096159))
            ThreePointArc((-11.8637687892, 32.269096159), (-12.0776575065, 35.9154722642), (-10.5480544763, 39.2324168906))
            Line((-10.5480544763, 39.2324168906), (-1.4462802792, 45.9774918854))
            Line((-1.4462802792, 45.9774918854), (0, 46.557336539))
            Line((0, 46.557336539), (1.4462802792, 45.9774918854))
            Line((1.4462802792, 45.9774918854), (10.5480544763, 39.2324168906))
            ThreePointArc((10.5480544763, 39.2324168906), (12.0776575065, 35.9154722642), (11.8637687892, 32.269096159))
            ThreePointArc((11.8637687892, 32.269096159), (9.8130602705, 30.3439953427), (10.825092271, 27.7196459355))
            ThreePointArc((10.825092271, 27.7196459355), (12.1286787232, 22.0440734554), (9.8568433896, 16.6821498424))
            ThreePointArc((9.8568433896, 16.6821498424), (7.0672827337, 14.6788128793), (6, 11.414472945))
            Line((6, 11.414472945), (6, 7.0072538219))
            Line((6, 7.0072538219), (6, 0))
            Line((6, 0), (7.5000002513, 11.414472945))
            ThreePointArc((7.5000002513, 11.414472945), (8.391991284, 13.9415584091), (10.6726818627, 15.3487753182))
            ThreePointArc((10.6726818627, 15.3487753182), (13.6200024271, 21.8800699646), (11.8968068959, 28.8352914154))
            ThreePointArc((11.8968068959, 28.8352914154), (11.3640087027, 30.251868892), (12.8284885302, 30.6337910005))
            ThreePointArc((12.8284885302, 30.6337910005), (13.635549564, 35.6633929404), (11.5888776878, 40.3280877233))
            Line((11.5888776878, 40.3280877233), (2.1839900136, 47.2977917949))
            Line((2.1839900136, 47.2977917949), (0, 48.173400037))
            Line((0, 48.173400037), (-2.1839900136, 47.2977917949))
            Line((-2.1839900136, 47.2977917949), (-11.5888776878, 40.3280877233))
            ThreePointArc((-11.5888776878, 40.3280877233), (-13.635549564, 35.6633929404), (-12.8284885302, 30.6337910005))
            ThreePointArc((-12.8284885302, 30.6337910005), (-11.3640087027, 30.251868892), (-11.8968068959, 28.8352914154))
            ThreePointArc((-11.8968068959, 28.8352914154), (-13.6200024271, 21.8800699646), (-10.6726818627, 15.3487753182))
            ThreePointArc((-10.6726818627, 15.3487753182), (-8.391991284, 13.9415584091), (-7.5000002513, 11.414472945))
            Line((-7.5000002513, 11.414472945), (-6, 0))
            Line((-6, 0), (-6, 7.0072538219))
        make_face()
    extrude(amount=-F5_DEPTH)

    # F6: fillet of radius 5 on 3 edges, made by hand

    # F6_s2 → F6_t1 (cut)
    with BuildSketch(Plane.XZ.offset(-19.5072538219)):
        with BuildLine():
            ThreePointArc((6, 8), (4.5355339059, 11.5355339059), (1, 13))
            Line((1, 13), (6, 13))
            Line((6, 13), (6, 8))
        make_face()
        with BuildLine():
            ThreePointArc((-6, 8), (-4.5355339059, 11.5355339059), (-1, 13))
            Line((-1, 13), (-6, 13))
            Line((-6, 13), (-6, 8))
        make_face()
    extrude(amount=F6_T1_DEPTH, mode=Mode.SUBTRACT)


solid = f1_5.part
